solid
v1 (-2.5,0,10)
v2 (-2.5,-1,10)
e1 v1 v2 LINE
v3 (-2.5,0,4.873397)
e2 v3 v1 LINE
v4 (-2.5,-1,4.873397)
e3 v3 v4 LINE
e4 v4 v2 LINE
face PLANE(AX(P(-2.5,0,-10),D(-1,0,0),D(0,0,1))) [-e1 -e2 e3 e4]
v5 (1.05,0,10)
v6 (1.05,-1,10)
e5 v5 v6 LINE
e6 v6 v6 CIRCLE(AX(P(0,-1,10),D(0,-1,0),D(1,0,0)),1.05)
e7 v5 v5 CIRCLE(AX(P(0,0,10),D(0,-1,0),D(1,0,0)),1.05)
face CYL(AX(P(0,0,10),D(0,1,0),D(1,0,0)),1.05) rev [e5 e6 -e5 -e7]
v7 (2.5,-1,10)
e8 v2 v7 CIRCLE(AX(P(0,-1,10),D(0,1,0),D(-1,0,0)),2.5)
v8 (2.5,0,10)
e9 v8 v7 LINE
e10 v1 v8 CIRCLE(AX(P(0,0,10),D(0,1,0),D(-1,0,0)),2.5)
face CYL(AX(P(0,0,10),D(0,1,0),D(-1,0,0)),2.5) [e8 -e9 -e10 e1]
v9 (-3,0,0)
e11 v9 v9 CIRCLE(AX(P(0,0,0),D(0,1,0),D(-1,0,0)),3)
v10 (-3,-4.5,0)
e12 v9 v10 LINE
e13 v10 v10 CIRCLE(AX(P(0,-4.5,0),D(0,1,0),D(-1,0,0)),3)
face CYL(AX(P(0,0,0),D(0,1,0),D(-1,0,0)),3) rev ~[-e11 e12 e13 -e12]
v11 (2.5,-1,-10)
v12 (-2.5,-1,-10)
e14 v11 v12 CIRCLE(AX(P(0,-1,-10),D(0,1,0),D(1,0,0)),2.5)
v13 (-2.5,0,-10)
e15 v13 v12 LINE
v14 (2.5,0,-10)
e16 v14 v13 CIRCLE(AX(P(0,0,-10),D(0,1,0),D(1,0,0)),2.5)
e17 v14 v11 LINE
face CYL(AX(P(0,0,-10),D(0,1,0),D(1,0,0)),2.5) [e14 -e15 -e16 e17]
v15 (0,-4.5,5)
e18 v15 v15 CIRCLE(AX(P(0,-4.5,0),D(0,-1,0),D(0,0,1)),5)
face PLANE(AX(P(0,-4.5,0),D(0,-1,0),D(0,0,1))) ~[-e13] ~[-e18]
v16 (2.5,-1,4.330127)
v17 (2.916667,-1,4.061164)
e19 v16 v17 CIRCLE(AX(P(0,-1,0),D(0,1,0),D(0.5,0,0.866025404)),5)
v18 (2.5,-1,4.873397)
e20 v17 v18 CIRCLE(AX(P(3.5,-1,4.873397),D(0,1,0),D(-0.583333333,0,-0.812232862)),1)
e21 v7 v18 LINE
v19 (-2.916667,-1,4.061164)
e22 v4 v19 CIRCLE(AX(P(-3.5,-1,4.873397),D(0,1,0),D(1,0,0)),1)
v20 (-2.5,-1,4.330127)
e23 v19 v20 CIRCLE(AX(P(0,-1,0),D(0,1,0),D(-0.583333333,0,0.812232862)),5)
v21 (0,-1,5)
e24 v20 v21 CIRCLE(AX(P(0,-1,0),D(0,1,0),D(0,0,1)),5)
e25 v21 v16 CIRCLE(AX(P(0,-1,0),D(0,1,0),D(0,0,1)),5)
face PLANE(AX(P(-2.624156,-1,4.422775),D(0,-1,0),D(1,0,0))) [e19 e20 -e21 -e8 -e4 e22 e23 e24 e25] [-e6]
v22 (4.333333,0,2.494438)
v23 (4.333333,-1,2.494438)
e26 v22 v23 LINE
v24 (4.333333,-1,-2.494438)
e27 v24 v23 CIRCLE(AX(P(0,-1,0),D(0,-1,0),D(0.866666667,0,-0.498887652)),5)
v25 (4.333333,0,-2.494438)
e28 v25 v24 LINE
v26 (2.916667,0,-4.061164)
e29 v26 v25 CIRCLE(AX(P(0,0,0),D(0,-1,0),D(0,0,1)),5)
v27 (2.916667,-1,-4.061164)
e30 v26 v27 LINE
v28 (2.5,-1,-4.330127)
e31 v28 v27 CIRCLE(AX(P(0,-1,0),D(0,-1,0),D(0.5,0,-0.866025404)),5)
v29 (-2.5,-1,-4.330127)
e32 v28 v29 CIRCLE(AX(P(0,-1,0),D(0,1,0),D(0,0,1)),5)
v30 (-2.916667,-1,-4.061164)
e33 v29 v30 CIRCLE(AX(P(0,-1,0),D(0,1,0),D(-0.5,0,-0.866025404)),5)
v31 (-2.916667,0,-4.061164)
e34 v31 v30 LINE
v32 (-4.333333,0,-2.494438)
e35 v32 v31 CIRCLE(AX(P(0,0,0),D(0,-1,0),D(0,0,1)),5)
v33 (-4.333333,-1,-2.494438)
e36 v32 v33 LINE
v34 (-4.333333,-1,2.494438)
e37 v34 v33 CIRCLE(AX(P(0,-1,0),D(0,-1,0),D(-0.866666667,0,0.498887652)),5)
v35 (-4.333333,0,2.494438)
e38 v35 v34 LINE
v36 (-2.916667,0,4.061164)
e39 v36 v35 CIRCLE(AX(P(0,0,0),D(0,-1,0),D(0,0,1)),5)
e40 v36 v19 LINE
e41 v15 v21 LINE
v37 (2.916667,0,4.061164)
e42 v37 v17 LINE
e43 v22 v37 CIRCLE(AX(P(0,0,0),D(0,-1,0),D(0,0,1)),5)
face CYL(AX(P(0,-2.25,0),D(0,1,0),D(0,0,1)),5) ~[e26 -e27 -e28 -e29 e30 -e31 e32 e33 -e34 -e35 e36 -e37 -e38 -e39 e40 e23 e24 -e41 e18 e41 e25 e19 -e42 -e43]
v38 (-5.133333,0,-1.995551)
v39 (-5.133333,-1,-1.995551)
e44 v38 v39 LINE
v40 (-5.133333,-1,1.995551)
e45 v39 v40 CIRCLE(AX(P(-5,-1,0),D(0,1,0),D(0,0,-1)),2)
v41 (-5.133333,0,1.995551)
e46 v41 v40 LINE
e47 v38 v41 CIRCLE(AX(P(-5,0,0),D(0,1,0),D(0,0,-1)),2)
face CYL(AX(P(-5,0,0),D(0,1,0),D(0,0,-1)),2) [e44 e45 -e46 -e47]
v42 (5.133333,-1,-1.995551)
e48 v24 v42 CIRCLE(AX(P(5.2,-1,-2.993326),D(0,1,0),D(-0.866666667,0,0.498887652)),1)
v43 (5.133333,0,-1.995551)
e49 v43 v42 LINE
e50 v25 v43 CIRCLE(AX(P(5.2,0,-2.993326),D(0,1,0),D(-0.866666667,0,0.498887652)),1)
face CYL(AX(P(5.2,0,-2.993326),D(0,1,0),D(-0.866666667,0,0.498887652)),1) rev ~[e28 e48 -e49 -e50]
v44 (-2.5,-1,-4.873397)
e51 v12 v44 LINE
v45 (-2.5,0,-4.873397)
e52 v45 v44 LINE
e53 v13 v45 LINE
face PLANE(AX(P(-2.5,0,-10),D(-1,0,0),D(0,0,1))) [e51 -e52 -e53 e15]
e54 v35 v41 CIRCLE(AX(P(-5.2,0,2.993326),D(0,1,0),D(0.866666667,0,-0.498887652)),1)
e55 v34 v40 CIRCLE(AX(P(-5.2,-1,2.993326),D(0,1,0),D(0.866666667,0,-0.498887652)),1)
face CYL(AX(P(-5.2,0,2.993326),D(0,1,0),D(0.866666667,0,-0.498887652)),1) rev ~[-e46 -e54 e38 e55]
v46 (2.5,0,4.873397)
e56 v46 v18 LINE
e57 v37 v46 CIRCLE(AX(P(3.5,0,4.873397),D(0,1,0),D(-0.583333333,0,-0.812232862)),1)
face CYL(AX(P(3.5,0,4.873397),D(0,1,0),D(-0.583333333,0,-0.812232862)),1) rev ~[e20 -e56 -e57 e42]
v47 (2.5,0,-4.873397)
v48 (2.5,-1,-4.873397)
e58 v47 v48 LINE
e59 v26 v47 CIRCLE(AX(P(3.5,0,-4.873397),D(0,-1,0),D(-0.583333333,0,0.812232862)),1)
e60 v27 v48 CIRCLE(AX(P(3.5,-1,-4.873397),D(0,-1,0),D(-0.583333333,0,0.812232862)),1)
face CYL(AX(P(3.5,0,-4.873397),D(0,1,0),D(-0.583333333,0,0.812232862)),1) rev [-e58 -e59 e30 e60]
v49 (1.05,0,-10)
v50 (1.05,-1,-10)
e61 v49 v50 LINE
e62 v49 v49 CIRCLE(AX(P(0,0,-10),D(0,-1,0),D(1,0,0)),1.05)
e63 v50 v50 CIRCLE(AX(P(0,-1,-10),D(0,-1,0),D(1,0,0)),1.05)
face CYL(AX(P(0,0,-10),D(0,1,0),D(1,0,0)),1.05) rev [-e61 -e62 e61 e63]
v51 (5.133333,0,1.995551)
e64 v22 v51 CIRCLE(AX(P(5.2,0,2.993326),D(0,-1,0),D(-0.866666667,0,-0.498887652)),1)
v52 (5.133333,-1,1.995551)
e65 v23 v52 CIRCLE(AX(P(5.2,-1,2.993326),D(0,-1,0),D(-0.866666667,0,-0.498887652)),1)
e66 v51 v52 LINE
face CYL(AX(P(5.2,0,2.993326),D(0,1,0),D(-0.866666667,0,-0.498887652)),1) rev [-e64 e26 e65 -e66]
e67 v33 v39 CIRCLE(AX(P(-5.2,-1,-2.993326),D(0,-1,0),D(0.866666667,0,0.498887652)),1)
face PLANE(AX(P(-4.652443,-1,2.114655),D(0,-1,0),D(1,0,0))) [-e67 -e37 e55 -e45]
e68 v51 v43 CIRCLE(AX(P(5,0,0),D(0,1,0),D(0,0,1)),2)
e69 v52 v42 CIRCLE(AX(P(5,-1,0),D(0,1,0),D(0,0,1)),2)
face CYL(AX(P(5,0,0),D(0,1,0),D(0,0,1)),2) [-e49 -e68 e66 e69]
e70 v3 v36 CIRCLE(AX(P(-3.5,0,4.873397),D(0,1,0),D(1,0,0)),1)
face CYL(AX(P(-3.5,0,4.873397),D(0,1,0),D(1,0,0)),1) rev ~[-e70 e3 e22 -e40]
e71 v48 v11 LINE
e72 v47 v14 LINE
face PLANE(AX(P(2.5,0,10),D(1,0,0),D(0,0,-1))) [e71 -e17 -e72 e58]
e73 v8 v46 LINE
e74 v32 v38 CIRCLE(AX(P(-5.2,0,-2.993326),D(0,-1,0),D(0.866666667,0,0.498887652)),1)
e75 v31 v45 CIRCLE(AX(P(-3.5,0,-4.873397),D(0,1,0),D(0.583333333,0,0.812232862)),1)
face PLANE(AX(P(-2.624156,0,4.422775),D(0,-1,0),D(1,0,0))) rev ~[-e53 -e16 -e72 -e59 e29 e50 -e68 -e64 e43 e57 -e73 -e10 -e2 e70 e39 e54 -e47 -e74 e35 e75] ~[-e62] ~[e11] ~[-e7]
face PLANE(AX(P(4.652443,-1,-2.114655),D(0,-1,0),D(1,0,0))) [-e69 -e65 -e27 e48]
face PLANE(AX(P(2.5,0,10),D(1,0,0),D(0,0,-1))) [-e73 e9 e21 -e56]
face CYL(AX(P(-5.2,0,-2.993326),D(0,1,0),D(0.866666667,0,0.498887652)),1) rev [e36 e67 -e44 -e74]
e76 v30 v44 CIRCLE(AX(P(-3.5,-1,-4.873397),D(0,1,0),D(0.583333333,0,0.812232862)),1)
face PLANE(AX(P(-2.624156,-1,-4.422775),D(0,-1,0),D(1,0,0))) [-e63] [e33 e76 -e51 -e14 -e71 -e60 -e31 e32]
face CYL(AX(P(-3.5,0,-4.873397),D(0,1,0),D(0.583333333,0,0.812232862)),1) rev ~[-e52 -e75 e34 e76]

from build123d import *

# Parameters (mm, degrees)
F0_W        = 4.5
F0_H        = 5
F3_DEPTH    = 1
F4_W        = 10
F4_H        = 4
F5_DEPTH    = 1
F6_T1_DEPTH = 1
F7_R        = 3
F8_DEPTH    = 4.501


# Not quite as in the source:
# - a fillet or chamfer that OpenCascade refuses, or shapes differently, is made with other operations: its cross-section is extruded or revolved along the edge and cut away or added


with BuildPart() as f1:
    # F0 (on Right) → F1 (revolve)
    with BuildSketch(Plane.YZ):
        with Locations((-2.25, 2.5)):
            Rectangle(F0_W, F0_H)
    revolve(axis=Axis((0, -2.25, 0), (0, -1, 0)))

    # F2 (on face) → F3 (join)
    with BuildSketch(Plane(origin=(0, 0, 0), x_dir=(-1, 0, 0), z_dir=(0, 1, 0))):
        with BuildLine():
            ThreePointArc((-2.5, -10), (0, -12.5), (2.5, -10))
            Line((2.5, -10), (1.05, -10))
            ThreePointArc((1.05, -10), (0, -11.05), (-1.05, -10))
            Line((-1.05, -10), (-2.5, -10))
        make_face()
        with BuildLine():
            Line((1.05, -10), (2.5, -10))
            Line((2.5, -10), (2.5, 10))
            Line((2.5, 10), (1.05, 10))
            ThreePointArc((1.05, 10), (0, 8.95), (-1.05, 10))
            Line((-1.05, 10), (-2.5, 10))
            Line((-2.5, 10), (-2.5, -10))
            Line((-2.5, -10), (-1.05, -10))
            ThreePointArc((-1.05, -10), (0, -8.95), (1.05, -10))
        make_face()
        with BuildLine():
            Line((1.05, 10), (2.5, 10))
            ThreePointArc((2.5, 10), (0, 12.5), (-2.5, 10))
            Line((-2.5, 10), (-1.05, 10))
            ThreePointArc((-1.05, 10), (0, 11.05), (1.05, 10))
        make_face()
    extrude(amount=-F3_DEPTH)

    # F4 (on face) → F5 (join)
    with BuildSketch(Plane(origin=(0, 0, 0), x_dir=(-1, 0, 0), z_dir=(0, 1, 0))):
        Rectangle(F4_W, F4_H)
        with BuildLine():
            Line((5, 2), (5, -2))
            ThreePointArc((5, -2), (7, 0), (5, 2))
        make_face()
        with BuildLine():
            ThreePointArc((-5, 2), (-7, 0), (-5, -2))
            Line((-5, -2), (-5, 2))
        make_face()
    extrude(amount=-F5_DEPTH)

    # F6: fillet of radius 1 on 8 edges, made by hand

    # F6_s2 → F6_t1 (join)
    with BuildSketch(Plane.XZ):
        with BuildLine():
            ThreePointArc((-2.5, 4.8733971724), (-2.610243479, 4.4169617078), (-2.9166666667, 4.0611643103))
            ThreePointArc((-2.9166666667, 4.0611643103), (-2.7116700904, 4.2008148401), (-2.5, 4.3301270189))
            Line((-2.5, 4.3301270189), (-2.5, 4.8733971724))
        make_face()
        with BuildLine():
            ThreePointArc((-2.9166666667, -4.0611643103), (-2.610243479, -4.4169617078), (-2.5, -4.8733971724))
            Line((-2.5, -4.8733971724), (-2.5, -4.3301270189))
            ThreePointArc((-2.5, -4.3301270189), (-2.7116700904, -4.2008148401), (-2.9166666667, -4.0611643103))
        make_face()
        with BuildLine():
            ThreePointArc((4.3333333333, 2.4944382578), (4.6708497378, 2.144797772), (5.1333333333, 1.9955506063))
            Line((5.1333333333, 1.9955506063), (5.1266666667, 1.895773076))
            ThreePointArc((5.1266666667, 1.895773076), (5, 1.9), (4.582575695, 1.9))
            Line((4.582575695, 1.9), (4.4909241811, 1.96))
            ThreePointArc((4.4909241811, 1.96), (4.3755080286, 2.2056585166), (4.2466666667, 2.4445494927))
            Line((4.2466666667, 2.4445494927), (4.3333333333, 2.4944382578))
        make_face()
        with BuildLine():
            ThreePointArc((-4.3333333333, 2.4944382578), (-4.6708497378, 2.144797772), (-5.1333333333, 1.9955506063))
            Line((-5.1333333333, 1.9955506063), (-5.1266666667, 1.895773076))
            ThreePointArc((-5.1266666667, 1.895773076), (-5, 1.9), (-4.582575695, 1.9))
            Line((-4.582575695, 1.9), (-4.4909241811, 1.96))
            ThreePointArc((-4.4909241811, 1.96), (-4.3755080286, 2.2056585166), (-4.2466666667, 2.4445494927))
            Line((-4.2466666667, 2.4445494927), (-4.3333333333, 2.4944382578))
        make_face()
        with BuildLine():
            ThreePointArc((4.3333333333, -2.4944382578), (4.6708497378, -2.144797772), (5.1333333333, -1.9955506063))
            Line((5.1333333333, -1.9955506063), (5.1266666667, -1.895773076))
            ThreePointArc((5.1266666667, -1.895773076), (5, -1.9), (4.582575695, -1.9))
            Line((4.582575695, -1.9), (4.4909241811, -1.96))
            ThreePointArc((4.4909241811, -1.96), (4.3755080286, -2.2056585166), (4.2466666667, -2.4445494927))
            Line((4.2466666667, -2.4445494927), (4.3333333333, -2.4944382578))
        make_face()
        with BuildLine():
            ThreePointArc((-4.3333333333, -2.4944382578), (-4.6708497378, -2.144797772), (-5.1333333333, -1.9955506063))
            Line((-5.1333333333, -1.9955506063), (-5.1266666667, -1.895773076))
            ThreePointArc((-5.1266666667, -1.895773076), (-5, -1.9), (-4.582575695, -1.9))
            Line((-4.582575695, -1.9), (-4.4909241811, -1.96))
            ThreePointArc((-4.4909241811, -1.96), (-4.3755080286, -2.2056585166), (-4.2466666667, -2.4445494927))
            Line((-4.2466666667, -2.4445494927), (-4.3333333333, -2.4944382578))
        make_face()
        with BuildLine():
            ThreePointArc((2.9166666667, 4.0611643103), (2.610243479, 4.4169617078), (2.5, 4.8733971724))
            Line((2.5, 4.8733971724), (2.5, 4.3301270189))
            ThreePointArc((2.5, 4.3301270189), (2.7116700904, 4.2008148401), (2.9166666667, 4.0611643103))
        make_face()
        with BuildLine():
            ThreePointArc((2.9166666667, -4.0611643103), (2.610243479, -4.4169617078), (2.5, -4.8733971724))
            Line((2.5, -4.8733971724), (2.5, -4.3301270189))
            ThreePointArc((2.5, -4.3301270189), (2.7116700904, -4.2008148401), (2.9166666667, -4.0611643103))
        make_face()
    extrude(amount=F6_T1_DEPTH)

    # F7 (on face) → F8 (cut, through all)
    with BuildSketch(Plane(origin=(0, 0, 0), x_dir=(-1, 0, 0), z_dir=(0, 1, 0))):
        Circle(F7_R)
    extrude(amount=-F8_DEPTH, mode=Mode.SUBTRACT)


solid = f1.part
